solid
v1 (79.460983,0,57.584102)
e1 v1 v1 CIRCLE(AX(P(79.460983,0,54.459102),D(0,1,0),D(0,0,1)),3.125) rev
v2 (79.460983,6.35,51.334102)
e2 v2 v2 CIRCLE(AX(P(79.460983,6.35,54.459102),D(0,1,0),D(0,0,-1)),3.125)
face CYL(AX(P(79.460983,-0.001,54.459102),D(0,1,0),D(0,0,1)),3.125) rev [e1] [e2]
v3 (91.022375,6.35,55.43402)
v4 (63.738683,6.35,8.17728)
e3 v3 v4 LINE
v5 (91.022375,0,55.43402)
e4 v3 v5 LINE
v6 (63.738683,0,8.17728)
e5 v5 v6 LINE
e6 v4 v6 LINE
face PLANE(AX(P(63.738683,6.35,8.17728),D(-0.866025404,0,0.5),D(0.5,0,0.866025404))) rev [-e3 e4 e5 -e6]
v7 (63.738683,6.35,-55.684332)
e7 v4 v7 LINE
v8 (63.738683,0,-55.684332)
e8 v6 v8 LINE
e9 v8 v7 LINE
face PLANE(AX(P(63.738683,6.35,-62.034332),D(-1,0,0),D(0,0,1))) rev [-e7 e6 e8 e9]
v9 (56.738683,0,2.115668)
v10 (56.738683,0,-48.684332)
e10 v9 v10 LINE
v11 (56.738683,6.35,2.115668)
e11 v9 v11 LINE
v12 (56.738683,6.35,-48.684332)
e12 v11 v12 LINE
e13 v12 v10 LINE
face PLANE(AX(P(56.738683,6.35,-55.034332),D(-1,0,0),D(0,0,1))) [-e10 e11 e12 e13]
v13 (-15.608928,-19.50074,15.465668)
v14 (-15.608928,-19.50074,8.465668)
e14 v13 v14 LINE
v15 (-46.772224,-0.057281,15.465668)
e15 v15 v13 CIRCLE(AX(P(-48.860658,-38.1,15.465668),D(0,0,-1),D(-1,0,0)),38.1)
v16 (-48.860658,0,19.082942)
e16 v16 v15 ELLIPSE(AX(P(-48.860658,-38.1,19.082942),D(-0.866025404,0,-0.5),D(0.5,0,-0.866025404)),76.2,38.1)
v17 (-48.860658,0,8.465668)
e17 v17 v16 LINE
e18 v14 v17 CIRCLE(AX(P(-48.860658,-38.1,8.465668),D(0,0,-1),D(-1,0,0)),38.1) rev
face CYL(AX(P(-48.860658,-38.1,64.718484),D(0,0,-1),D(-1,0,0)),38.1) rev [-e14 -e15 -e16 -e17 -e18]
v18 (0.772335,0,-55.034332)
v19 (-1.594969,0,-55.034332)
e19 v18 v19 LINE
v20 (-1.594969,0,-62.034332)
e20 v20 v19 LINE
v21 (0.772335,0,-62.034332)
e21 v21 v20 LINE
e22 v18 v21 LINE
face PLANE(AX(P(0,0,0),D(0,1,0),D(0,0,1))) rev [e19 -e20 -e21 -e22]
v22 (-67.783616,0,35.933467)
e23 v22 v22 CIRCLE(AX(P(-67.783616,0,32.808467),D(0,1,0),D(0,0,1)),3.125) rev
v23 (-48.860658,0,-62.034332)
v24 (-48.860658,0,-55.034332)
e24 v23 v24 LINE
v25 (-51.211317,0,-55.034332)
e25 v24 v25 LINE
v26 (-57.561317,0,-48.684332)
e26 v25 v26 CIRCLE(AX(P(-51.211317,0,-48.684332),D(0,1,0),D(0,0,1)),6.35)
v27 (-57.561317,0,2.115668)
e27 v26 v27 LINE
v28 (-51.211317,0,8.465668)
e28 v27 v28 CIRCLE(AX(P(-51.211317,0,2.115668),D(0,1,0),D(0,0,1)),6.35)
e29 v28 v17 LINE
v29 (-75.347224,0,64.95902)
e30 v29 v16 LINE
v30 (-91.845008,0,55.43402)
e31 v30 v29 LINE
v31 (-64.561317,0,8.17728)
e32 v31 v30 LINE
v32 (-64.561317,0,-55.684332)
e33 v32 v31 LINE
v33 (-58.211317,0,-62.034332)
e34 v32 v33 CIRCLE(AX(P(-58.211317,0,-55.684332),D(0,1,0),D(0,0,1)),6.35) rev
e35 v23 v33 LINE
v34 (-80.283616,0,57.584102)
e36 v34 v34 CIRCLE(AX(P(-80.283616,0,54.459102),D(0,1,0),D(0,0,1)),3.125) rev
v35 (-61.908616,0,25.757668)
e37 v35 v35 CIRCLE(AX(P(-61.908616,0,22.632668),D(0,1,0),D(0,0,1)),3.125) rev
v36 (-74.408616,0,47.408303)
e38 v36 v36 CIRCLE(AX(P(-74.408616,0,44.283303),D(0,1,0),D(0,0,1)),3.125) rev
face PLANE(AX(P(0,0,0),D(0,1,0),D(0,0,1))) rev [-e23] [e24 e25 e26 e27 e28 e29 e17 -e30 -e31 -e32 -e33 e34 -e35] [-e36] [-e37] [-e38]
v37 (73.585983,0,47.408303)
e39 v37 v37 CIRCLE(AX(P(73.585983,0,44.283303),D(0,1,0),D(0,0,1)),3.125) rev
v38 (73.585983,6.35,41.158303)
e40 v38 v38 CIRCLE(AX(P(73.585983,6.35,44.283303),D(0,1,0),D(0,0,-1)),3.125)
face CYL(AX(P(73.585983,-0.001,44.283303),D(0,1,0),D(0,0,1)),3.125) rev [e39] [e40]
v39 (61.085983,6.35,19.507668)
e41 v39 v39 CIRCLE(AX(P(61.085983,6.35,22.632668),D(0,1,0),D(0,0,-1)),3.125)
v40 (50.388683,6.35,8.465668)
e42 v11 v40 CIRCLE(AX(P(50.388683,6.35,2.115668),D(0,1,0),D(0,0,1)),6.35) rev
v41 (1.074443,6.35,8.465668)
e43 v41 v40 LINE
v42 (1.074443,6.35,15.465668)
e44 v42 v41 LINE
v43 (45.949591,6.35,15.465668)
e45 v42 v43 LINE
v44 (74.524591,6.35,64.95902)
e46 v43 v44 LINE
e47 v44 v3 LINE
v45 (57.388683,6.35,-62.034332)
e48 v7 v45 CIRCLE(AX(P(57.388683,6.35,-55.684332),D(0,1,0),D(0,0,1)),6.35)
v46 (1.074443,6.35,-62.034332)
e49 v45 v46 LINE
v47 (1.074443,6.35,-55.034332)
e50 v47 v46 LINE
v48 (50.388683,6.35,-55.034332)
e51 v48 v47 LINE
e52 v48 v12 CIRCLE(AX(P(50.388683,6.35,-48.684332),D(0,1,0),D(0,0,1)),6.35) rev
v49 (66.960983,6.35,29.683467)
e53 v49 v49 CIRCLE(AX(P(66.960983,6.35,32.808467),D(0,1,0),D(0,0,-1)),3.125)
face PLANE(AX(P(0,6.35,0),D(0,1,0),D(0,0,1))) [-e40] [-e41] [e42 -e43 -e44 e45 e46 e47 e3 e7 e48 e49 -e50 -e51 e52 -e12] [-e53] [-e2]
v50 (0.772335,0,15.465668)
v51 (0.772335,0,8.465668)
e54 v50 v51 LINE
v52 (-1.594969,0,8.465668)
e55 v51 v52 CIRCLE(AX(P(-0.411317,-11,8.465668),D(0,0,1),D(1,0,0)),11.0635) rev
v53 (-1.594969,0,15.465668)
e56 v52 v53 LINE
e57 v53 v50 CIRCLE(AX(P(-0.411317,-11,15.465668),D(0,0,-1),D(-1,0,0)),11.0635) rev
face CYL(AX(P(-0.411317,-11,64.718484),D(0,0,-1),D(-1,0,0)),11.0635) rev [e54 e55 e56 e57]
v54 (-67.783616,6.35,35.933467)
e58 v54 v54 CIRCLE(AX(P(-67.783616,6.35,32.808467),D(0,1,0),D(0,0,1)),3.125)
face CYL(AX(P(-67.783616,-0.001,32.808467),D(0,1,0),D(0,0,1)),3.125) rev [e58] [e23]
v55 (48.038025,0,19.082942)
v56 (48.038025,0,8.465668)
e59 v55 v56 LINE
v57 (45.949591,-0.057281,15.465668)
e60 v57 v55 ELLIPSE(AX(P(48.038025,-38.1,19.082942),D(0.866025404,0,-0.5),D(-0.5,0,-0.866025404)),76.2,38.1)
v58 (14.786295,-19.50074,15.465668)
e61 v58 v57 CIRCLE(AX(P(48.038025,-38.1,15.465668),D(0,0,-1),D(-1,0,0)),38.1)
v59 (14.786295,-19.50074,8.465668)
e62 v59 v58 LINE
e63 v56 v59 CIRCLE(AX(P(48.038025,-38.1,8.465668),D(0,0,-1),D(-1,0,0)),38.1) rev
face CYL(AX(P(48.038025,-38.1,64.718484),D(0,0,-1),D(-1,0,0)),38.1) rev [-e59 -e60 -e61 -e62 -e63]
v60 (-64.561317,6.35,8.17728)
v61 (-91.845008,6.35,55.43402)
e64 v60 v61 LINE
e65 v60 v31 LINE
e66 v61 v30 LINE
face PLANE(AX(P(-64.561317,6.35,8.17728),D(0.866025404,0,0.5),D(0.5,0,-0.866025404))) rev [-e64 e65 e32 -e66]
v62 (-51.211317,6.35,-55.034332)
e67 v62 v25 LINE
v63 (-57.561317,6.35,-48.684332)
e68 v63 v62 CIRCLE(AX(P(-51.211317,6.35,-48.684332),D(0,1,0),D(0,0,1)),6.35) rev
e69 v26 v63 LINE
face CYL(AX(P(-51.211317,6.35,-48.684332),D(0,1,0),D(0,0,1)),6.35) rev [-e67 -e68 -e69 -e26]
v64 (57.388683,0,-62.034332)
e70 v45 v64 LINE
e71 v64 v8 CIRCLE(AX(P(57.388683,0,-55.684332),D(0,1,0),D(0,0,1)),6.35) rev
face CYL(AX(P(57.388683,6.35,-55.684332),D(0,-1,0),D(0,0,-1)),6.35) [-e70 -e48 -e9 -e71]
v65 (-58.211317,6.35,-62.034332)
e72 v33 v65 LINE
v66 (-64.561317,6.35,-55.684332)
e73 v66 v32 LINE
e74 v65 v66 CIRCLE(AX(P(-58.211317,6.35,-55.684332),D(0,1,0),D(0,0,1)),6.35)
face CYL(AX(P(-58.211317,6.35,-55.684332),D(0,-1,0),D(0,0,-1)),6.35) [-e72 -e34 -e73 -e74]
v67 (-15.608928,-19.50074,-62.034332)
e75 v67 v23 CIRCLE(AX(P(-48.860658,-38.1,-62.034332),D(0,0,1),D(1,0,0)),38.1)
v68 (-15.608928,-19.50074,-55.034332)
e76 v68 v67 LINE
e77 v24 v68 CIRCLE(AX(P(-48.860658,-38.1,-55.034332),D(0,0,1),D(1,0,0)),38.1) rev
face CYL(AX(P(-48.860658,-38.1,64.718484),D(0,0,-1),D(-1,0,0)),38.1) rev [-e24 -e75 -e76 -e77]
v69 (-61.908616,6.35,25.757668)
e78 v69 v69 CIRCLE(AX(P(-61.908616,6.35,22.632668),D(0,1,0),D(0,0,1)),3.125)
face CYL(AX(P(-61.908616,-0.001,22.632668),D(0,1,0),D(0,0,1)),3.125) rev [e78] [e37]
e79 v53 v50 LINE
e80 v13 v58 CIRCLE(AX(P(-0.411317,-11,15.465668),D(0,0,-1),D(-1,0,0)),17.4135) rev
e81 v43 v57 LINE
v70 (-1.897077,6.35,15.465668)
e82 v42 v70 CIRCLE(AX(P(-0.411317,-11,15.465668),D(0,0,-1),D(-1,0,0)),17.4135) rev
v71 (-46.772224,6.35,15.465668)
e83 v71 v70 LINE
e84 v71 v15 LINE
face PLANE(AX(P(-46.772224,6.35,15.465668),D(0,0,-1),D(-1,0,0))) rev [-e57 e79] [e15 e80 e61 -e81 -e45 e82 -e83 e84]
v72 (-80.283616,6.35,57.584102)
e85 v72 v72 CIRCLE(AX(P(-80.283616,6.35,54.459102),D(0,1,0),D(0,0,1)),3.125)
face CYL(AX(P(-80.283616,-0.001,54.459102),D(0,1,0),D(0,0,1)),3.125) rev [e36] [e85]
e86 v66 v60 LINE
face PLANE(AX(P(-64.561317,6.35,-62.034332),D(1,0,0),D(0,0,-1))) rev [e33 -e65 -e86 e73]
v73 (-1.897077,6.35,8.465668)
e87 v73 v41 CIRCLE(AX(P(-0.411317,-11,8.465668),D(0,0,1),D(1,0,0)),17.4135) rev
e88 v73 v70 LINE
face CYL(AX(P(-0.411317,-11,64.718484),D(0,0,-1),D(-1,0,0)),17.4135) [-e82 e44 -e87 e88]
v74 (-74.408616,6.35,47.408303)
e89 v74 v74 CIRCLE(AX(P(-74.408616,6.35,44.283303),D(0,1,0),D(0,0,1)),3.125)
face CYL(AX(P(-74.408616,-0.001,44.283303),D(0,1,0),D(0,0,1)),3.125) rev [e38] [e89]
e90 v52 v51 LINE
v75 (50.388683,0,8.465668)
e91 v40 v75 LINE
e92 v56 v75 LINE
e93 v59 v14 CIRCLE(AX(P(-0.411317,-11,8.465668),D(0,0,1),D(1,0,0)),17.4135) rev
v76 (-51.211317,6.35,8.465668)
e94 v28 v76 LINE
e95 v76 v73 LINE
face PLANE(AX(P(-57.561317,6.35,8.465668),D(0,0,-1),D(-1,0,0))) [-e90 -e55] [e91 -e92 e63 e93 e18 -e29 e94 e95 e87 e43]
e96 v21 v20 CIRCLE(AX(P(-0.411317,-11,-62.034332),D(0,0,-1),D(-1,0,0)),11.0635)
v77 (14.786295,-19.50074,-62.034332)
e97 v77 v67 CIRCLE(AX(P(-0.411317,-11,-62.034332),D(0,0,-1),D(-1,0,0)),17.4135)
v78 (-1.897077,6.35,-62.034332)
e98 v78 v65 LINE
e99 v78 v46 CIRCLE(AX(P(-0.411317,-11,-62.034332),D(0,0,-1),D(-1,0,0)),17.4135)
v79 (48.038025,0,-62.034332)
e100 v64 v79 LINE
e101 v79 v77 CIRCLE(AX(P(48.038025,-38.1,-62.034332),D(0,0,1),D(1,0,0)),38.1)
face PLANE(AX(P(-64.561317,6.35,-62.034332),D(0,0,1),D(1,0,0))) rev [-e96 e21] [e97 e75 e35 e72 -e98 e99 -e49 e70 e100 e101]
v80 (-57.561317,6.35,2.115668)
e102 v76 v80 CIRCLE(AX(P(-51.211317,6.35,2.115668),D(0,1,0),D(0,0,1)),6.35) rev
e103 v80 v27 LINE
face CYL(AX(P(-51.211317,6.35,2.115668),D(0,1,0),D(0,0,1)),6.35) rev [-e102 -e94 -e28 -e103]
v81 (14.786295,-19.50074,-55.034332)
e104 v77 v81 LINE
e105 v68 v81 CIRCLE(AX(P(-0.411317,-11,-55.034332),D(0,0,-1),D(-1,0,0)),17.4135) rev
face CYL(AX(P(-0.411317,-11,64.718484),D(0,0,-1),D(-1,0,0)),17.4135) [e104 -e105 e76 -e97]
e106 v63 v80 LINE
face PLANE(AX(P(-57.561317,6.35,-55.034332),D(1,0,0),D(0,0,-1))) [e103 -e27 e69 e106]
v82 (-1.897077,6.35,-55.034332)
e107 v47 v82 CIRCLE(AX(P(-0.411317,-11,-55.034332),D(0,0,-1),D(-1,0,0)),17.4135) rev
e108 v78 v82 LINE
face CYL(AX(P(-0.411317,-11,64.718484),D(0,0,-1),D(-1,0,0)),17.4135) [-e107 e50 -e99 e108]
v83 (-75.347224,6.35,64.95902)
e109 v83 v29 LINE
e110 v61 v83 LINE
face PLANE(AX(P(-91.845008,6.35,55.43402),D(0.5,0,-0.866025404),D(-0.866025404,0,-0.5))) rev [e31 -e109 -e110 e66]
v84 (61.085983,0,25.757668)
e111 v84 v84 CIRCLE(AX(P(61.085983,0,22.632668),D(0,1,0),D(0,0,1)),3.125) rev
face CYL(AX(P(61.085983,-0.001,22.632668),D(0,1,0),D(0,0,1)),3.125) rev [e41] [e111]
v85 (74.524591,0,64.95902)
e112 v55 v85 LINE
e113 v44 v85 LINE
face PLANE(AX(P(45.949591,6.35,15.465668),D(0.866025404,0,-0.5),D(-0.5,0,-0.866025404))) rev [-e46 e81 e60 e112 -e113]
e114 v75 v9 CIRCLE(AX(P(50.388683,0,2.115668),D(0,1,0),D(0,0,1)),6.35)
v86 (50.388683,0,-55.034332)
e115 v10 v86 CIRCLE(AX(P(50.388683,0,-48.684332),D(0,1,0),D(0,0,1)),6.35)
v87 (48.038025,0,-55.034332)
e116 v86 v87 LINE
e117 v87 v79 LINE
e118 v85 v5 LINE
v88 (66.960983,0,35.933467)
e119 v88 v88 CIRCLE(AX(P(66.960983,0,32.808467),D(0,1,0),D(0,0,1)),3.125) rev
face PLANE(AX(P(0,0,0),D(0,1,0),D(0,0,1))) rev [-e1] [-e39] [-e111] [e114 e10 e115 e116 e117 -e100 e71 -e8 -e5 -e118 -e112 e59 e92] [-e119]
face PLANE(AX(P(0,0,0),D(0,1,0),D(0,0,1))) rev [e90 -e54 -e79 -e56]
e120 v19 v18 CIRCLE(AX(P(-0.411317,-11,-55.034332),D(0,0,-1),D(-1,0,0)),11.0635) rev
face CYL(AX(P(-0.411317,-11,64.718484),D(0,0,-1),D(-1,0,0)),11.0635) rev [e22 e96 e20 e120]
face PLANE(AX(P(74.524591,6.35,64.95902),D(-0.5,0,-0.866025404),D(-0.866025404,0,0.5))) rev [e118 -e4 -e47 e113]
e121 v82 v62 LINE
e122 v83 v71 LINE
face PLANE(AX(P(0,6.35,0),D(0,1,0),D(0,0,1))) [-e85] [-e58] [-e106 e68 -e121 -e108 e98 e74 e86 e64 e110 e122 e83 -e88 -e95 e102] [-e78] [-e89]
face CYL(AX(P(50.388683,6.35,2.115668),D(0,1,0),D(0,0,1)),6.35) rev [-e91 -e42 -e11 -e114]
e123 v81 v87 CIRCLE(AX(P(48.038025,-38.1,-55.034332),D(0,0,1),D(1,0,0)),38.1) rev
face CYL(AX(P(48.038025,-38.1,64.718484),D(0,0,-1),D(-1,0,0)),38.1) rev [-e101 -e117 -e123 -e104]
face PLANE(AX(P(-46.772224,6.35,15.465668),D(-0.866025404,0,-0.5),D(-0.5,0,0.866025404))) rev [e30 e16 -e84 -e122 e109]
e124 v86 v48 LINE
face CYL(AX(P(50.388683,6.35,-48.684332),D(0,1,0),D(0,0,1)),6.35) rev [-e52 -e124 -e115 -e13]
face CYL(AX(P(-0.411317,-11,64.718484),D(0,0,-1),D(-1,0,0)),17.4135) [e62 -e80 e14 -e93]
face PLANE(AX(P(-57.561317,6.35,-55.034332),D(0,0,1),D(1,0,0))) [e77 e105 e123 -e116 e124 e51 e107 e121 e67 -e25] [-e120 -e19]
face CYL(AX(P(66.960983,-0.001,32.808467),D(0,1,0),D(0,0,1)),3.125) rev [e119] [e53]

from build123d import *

# Parameters (mm, degrees)
SKETCH2_W               = 114.3
SKETCH2_H               = 63.5
BOSS_EXTRUDE1_DEPTH     = 6.35
CUT_EXTRUDE1_REACH      = 114.674
SKETCH3_R               = 3.125
BOSS_EXTRUDE7_REACH     = 158.854
SKETCH5_R               = 17.4135
SKETCH5_R_2             = 11.0635
FILLET1_R               = 38.1
CUT_EXTRUDE2_DEPTH      = 118.744132595
CUT_EXTRUDE2_DEPTH_BACK = 118.744132595
SKETCH6_W               = 114.3
SKETCH6_H               = 63.5
FILLET2_R               = 6.35


with BuildPart() as part:
    # Sketch2 → Boss-Extrude1 (new body)
    with BuildSketch(Plane(origin=(0, 0, 0), x_dir=(1, 0, 0), z_dir=(0, 1, 0))):
        Polygon((-64.561316825, 62.034331754), (-64.561316825, -8.177280248), (-91.845008266, -55.434020042), (-75.347224324, -64.959020042), (-46.772224324, -15.465668216), (45.949590674, -15.465668216), (74.524590674, -64.959020042), (91.022374616, -55.434020042), (63.738683175, -8.177280248), (63.738683175, 62.034331754), align=None)
        with Locations((-0.411316825, 23.284331754)):
            Rectangle(SKETCH2_W, SKETCH2_H, mode=Mode.SUBTRACT)
    extrude(amount=BOSS_EXTRUDE1_DEPTH)

    # Sketch3 → Cut-Extrude1 (cut, up to next)
    with BuildSketch(Plane(origin=(0, 6.35, 0), x_dir=(1, 0, 0), z_dir=(0, 1, 0)), mode=Mode.PRIVATE) as cut_extrude1_sk1:
        with Locations(Location((-67.783616297, -32.808466651, 0), (0, 0, 270))):
            Circle(SKETCH3_R)
    cut_extrude1_tool1 = extrude(cut_extrude1_sk1.sketch, amount=-CUT_EXTRUDE1_REACH, mode=Mode.PRIVATE) & part.part
    # Sketch3 → Cut-Extrude1 (cut, up to next)
    with BuildSketch(Plane(origin=(0, 6.35, 0), x_dir=(1, 0, 0), z_dir=(0, 1, 0)), mode=Mode.PRIVATE) as cut_extrude1_sk2:
        with Locations(Location((-61.908616236, -22.632668051, 0), (0, 0, 270))):
            Circle(SKETCH3_R)
    cut_extrude1_tool2 = extrude(cut_extrude1_sk2.sketch, amount=-CUT_EXTRUDE1_REACH, mode=Mode.PRIVATE) & part.part
    # Sketch3 → Cut-Extrude1 (cut, up to next)
    with BuildSketch(Plane(origin=(0, 6.35, 0), x_dir=(1, 0, 0), z_dir=(0, 1, 0)), mode=Mode.PRIVATE) as cut_extrude1_sk3:
        with Locations(Location((-74.408616255, -44.283303179, 0), (0, 0, 270))):
            Circle(SKETCH3_R)
    cut_extrude1_tool3 = extrude(cut_extrude1_sk3.sketch, amount=-CUT_EXTRUDE1_REACH, mode=Mode.PRIVATE) & part.part
    # Sketch3 → Cut-Extrude1 (cut, up to next)
    with BuildSketch(Plane(origin=(0, 6.35, 0), x_dir=(1, 0, 0), z_dir=(0, 1, 0)), mode=Mode.PRIVATE) as cut_extrude1_sk4:
        with Locations(Location((-80.283616316, -54.459101779, 0), (0, 0, 270))):
            Circle(SKETCH3_R)
    cut_extrude1_tool4 = extrude(cut_extrude1_sk4.sketch, amount=-CUT_EXTRUDE1_REACH, mode=Mode.PRIVATE) & part.part
    # Sketch3 → Cut-Extrude1 (cut, up to next)
    with BuildSketch(Plane(origin=(0, 6.35, 0), x_dir=(1, 0, 0), z_dir=(0, 1, 0)), mode=Mode.PRIVATE) as cut_extrude1_sk5:
        with Locations(Location((79.460982666, -54.459101779, 0), (0, 0, 270))):
            Circle(SKETCH3_R)
    cut_extrude1_tool5 = extrude(cut_extrude1_sk5.sketch, amount=-CUT_EXTRUDE1_REACH, mode=Mode.PRIVATE) & part.part
    # Sketch3 → Cut-Extrude1 (cut, up to next)
    with BuildSketch(Plane(origin=(0, 6.35, 0), x_dir=(1, 0, 0), z_dir=(0, 1, 0)), mode=Mode.PRIVATE) as cut_extrude1_sk6:
        with Locations(Location((73.585982605, -44.283303179, 0), (0, 0, 270))):
            Circle(SKETCH3_R)
    cut_extrude1_tool6 = extrude(cut_extrude1_sk6.sketch, amount=-CUT_EXTRUDE1_REACH, mode=Mode.PRIVATE) & part.part
    # Sketch3 → Cut-Extrude1 (cut, up to next)
    with BuildSketch(Plane(origin=(0, 6.35, 0), x_dir=(1, 0, 0), z_dir=(0, 1, 0)), mode=Mode.PRIVATE) as cut_extrude1_sk7:
        with Locations(Location((61.085982586, -22.632668051, 0), (0, 0, 270))):
            Circle(SKETCH3_R)
    cut_extrude1_tool7 = extrude(cut_extrude1_sk7.sketch, amount=-CUT_EXTRUDE1_REACH, mode=Mode.PRIVATE) & part.part
    # Sketch3 → Cut-Extrude1 (cut, up to next)
    with BuildSketch(Plane(origin=(0, 6.35, 0), x_dir=(1, 0, 0), z_dir=(0, 1, 0)), mode=Mode.PRIVATE) as cut_extrude1_sk8:
        with Locations(Location((66.960982647, -32.808466651, 0), (0, 0, 270))):
            Circle(SKETCH3_R)
    cut_extrude1_tool8 = extrude(cut_extrude1_sk8.sketch, amount=-CUT_EXTRUDE1_REACH, mode=Mode.PRIVATE) & part.part
    add(cut_extrude1_tool1.solids().sort_by_distance((-67.783616, 6.35, 32.808467))[0], mode=Mode.SUBTRACT)
    add(cut_extrude1_tool2.solids().sort_by_distance((-61.908616, 6.35, 22.632668))[0], mode=Mode.SUBTRACT)
    add(cut_extrude1_tool3.solids().sort_by_distance((-74.408616, 6.35, 44.283303))[0], mode=Mode.SUBTRACT)
    add(cut_extrude1_tool4.solids().sort_by_distance((-80.283616, 6.35, 54.459102))[0], mode=Mode.SUBTRACT)
    add(cut_extrude1_tool5.solids().sort_by_distance((79.460983, 6.35, 54.459102))[0], mode=Mode.SUBTRACT)
    add(cut_extrude1_tool6.solids().sort_by_distance((73.585983, 6.35, 44.283303))[0], mode=Mode.SUBTRACT)
    add(cut_extrude1_tool7.solids().sort_by_distance((61.085983, 6.35, 22.632668))[0], mode=Mode.SUBTRACT)
    add(cut_extrude1_tool8.solids().sort_by_distance((66.960983, 6.35, 32.808467))[0], mode=Mode.SUBTRACT)

    # Boss-Extrude7: up to this face of the body (flat: up to its plane)
    boss_extrude7_end = Plane(part.part.faces().sort_by_distance((-0.411316825, 3.175, 15.465668216))[0])
    # Sketch5 → Boss-Extrude7 (add, up to the picked face)
    with BuildSketch(Plane(origin=(0, 0, -62.034331754), x_dir=(-1, 0, 0), z_dir=(0, 0, -1)), mode=Mode.PRIVATE) as boss_extrude7_sk1:
        with Locations(Location((0.411316825, -11, 0), (0, 0, 39.175198934))):
            Circle(SKETCH5_R)
        with Locations(Location((0.411316825, -11, 0), (0, 0, 83.858334426))):
            Circle(SKETCH5_R_2, mode=Mode.SUBTRACT)
    boss_extrude7_tool1 = split(extrude(boss_extrude7_sk1.sketch, amount=-BOSS_EXTRUDE7_REACH, mode=Mode.PRIVATE), bisect_by=boss_extrude7_end, keep=Keep.BOTH, mode=Mode.PRIVATE)
    add(boss_extrude7_tool1.solids().sort_by(Axis((12.706125, -21.688873, -62.034332), (0, 0, 1)))[0])

    # Fillet1
    # the kernel refuses this fillet: 38.1 mm, written as the material it adds along each edge
    with BuildSketch(Plane(origin=(-13.910575406, 0, -62.034331754), x_dir=(-0.0867632885558369, -0.9962289554911443, 0), z_dir=(0, 0, 1))) as fillet1_piece_1:
        with BuildLine():
            CenterArc((40.988707325, -31.512603208), FILLET1_R, 124.197770407, 60.77965812)
            Line((3.032384121, -34.818284502), (0, 0))
            ThreePointArc((0, 0), (9.787278443, -3.010751549), (19.574556886, 0))
        make_face()
    extrude(amount=7)
    with BuildSketch(Plane(origin=(-13.910575406, 0, -62.034331754), x_dir=(-0.0867632885558369, -0.9962289554911443, 0), z_dir=(0, 0, 1))) as fillet1_piece_2_section:
        with BuildLine():
            CenterArc((40.988707325, -31.512603208), FILLET1_R, 124.197770407, 60.77965812)
            Line((3.032384121, -34.818284502), (0, 0))
            ThreePointArc((0, 0), (9.787278443, -3.010751549), (19.574556886, 0))
        make_face()
    fillet1_piece_2 = extrude(amount=94.37520705, mode=Mode.PRIVATE)
    fillet1_piece_2 = split(fillet1_piece_2, bisect_by=Plane(origin=(-46.479711347, 0.329171961, 15.465668216), z_dir=(0, 0, -1)), keep=Keep.TOP, mode=Mode.PRIVATE)
    fillet1_piece_2 = split(fillet1_piece_2, bisect_by=Plane(origin=(-46.479711347, 0.329171961, 8.465668246), z_dir=(0, 0, 1)), keep=Keep.TOP, mode=Mode.PRIVATE)
    fillet1_piece_2 = split(fillet1_piece_2, bisect_by=Plane(origin=(-44.894051642, 0.329171961, 12.212577706), z_dir=(-0.8660254037844385, 0, -0.5000000000000003)), keep=Keep.TOP, mode=Mode.PRIVATE)
    add(fillet1_piece_2)
    with BuildSketch(Plane(origin=(-13.910575406, 0, -62.034331754), x_dir=(-0.0867632885558369, -0.9962289554911443, 0), z_dir=(0, 0, 1))) as fillet1_piece_3_section:
        with BuildLine():
            CenterArc((40.988707325, -31.512603208), FILLET1_R, 124.197770407, 60.77965812)
            Line((3.032384121, -34.818284502), (0, 0))
            ThreePointArc((0, 0), (9.787278443, -3.010751549), (19.574556886, 0))
        make_face()
    fillet1_piece_3 = extrude(amount=94.37520705, mode=Mode.PRIVATE)
    fillet1_piece_3 = split(fillet1_piece_3, bisect_by=Plane(origin=(-48.157624669, 0.376146064, 15.465668216), z_dir=(0, 0, 1)), keep=Keep.TOP, mode=Mode.PRIVATE)
    fillet1_piece_3 = split(fillet1_piece_3, bisect_by=Plane(origin=(-47.638099539, 0.376146064, 16.965408082), z_dir=(-0.8660254037844385, 0, -0.5000000000000003)), keep=Keep.TOP, mode=Mode.PRIVATE)
    add(fillet1_piece_3)
    with BuildSketch(Plane(origin=(-13.910575406, 0, -62.034331754), x_dir=(-0.0867632885558369, -0.9962289554911443, 0), z_dir=(0, 0, 1))) as fillet1_piece_4_section:
        with BuildLine():
            CenterArc((40.988707325, -31.512603208), FILLET1_R, 124.197770407, 60.77965812)
            Line((3.032384121, -34.818284502), (0, 0))
            ThreePointArc((0, 0), (9.787278443, -3.010751549), (19.574556886, 0))
        make_face()
    fillet1_piece_4 = extrude(amount=94.37520705, mode=Mode.PRIVATE)
    fillet1_piece_4 = split(fillet1_piece_4, bisect_by=Plane(origin=(-24.321436326, -4.363073993, 15.465668216), z_dir=(0, 0, -1)), keep=Keep.TOP, mode=Mode.PRIVATE)
    fillet1_piece_4 = split(fillet1_piece_4, bisect_by=Plane(origin=(-24.321436326, -4.363073993, 8.465668246), z_dir=(0, 0, 1)), keep=Keep.TOP, mode=Mode.PRIVATE)
    fillet1_piece_4 = split(fillet1_piece_4, bisect_by=Plane(origin=(-39.648984709, -4.363073993, 3.127855288), z_dir=(0.8660254037844385, 0, 0.5000000000000003)), keep=Keep.TOP, mode=Mode.PRIVATE)
    add(fillet1_piece_4)
    with BuildSketch(Plane(origin=(13.087941757, 0, 32.340875296), x_dir=(0.08676328855268206, -0.9962289554914191, 0), z_dir=(0, 0, -1))) as fillet1_piece_5_section:
        with BuildLine():
            CenterArc((40.988707325, -31.512603208), FILLET1_R, 124.197770407, 60.77965812)
            Line((3.032384121, -34.818284502), (0, 0))
            ThreePointArc((0, 0), (9.787278443, -3.010751549), (19.574556886, 0))
        make_face()
    fillet1_piece_5 = extrude(amount=94.37520705, mode=Mode.PRIVATE)
    fillet1_piece_5 = split(fillet1_piece_5, bisect_by=Plane(origin=(47.334991019, 0.376146064, 15.465668216), z_dir=(0, 0, 1)), keep=Keep.TOP, mode=Mode.PRIVATE)
    fillet1_piece_5 = split(fillet1_piece_5, bisect_by=Plane(origin=(46.81546589, 0.376146064, 16.965408082), z_dir=(0.8660254037844373, 0, -0.5000000000000024)), keep=Keep.TOP, mode=Mode.PRIVATE)
    add(fillet1_piece_5)
    with BuildSketch(Plane(origin=(13.087941757, 0, 32.340875296), x_dir=(0.08676328855268206, -0.9962289554914191, 0), z_dir=(0, 0, -1))) as fillet1_piece_6_section:
        with BuildLine():
            CenterArc((40.988707325, -31.512603208), FILLET1_R, 124.197770407, 60.77965812)
            Line((3.032384121, -34.818284502), (0, 0))
            ThreePointArc((0, 0), (9.787278443, -3.010751549), (19.574556886, 0))
        make_face()
    fillet1_piece_6 = extrude(amount=94.37520705, mode=Mode.PRIVATE)
    fillet1_piece_6 = split(fillet1_piece_6, bisect_by=Plane(origin=(23.498802677, -4.363073993, 15.465668216), z_dir=(0, 0, -1)), keep=Keep.TOP, mode=Mode.PRIVATE)
    fillet1_piece_6 = split(fillet1_piece_6, bisect_by=Plane(origin=(38.826351059, -4.363073993, 3.127855288), z_dir=(-0.8660254037844373, 0, 0.5000000000000024)), keep=Keep.TOP, mode=Mode.PRIVATE)
    fillet1_piece_6 = split(fillet1_piece_6, bisect_by=Plane(origin=(23.498802677, -4.363073993, 8.465668246), z_dir=(0, 0, 1)), keep=Keep.TOP, mode=Mode.PRIVATE)
    add(fillet1_piece_6)
    with BuildSketch(Plane(origin=(13.087941757, 0, 32.340875296), x_dir=(0.08676328855268206, -0.9962289554914191, 0), z_dir=(0, 0, -1))) as fillet1_piece_7_section:
        with BuildLine():
            CenterArc((40.988707325, -31.512603208), FILLET1_R, 124.197770407, 60.77965812)
            Line((3.032384121, -34.818284502), (0, 0))
            ThreePointArc((0, 0), (9.787278443, -3.010751549), (19.574556886, 0))
        make_face()
    fillet1_piece_7 = extrude(amount=94.37520705, mode=Mode.PRIVATE)
    fillet1_piece_7 = split(fillet1_piece_7, bisect_by=Plane(origin=(45.657077697, 0.329171961, 15.465668216), z_dir=(0, 0, -1)), keep=Keep.TOP, mode=Mode.PRIVATE)
    fillet1_piece_7 = split(fillet1_piece_7, bisect_by=Plane(origin=(44.071417993, 0.329171961, 12.212577706), z_dir=(0.8660254037844373, 0, -0.5000000000000024)), keep=Keep.TOP, mode=Mode.PRIVATE)
    fillet1_piece_7 = split(fillet1_piece_7, bisect_by=Plane(origin=(45.657077697, 0.329171961, 8.465668246), z_dir=(0, 0, 1)), keep=Keep.TOP, mode=Mode.PRIVATE)
    add(fillet1_piece_7)
    with BuildSketch(Plane(origin=(13.087941757, 0, -55.034331754), x_dir=(0.08676328855268206, -0.9962289554914191, 0), z_dir=(0, 0, -1))) as fillet1_piece_8:
        with BuildLine():
            CenterArc((40.988707325, -31.512603208), FILLET1_R, 124.197770407, 60.77965812)
            Line((3.032384121, -34.818284502), (0, 0))
            ThreePointArc((0, 0), (9.787278443, -3.010751549), (19.574556886, 0))
        make_face()
    extrude(amount=7)
    with BuildSketch(Plane(origin=(13.087941757, 0, 102.840875266), x_dir=(0.08676328855268206, -0.9962289554914191, 0), z_dir=(0, 0, -1))) as fillet1_piece_9_section:
        with BuildLine():
            CenterArc((40.988707325, -31.512603208), FILLET1_R, 124.197770407, 60.77965812)
            Line((3.032384121, -34.818284502), (0, 0))
            ThreePointArc((0, 0), (9.787278443, -3.010751549), (19.574556886, 0))
        make_face()
    fillet1_piece_9 = extrude(amount=94.37520702, mode=Mode.PRIVATE)
    fillet1_piece_9 = split(fillet1_piece_9, bisect_by=Plane(origin=(47.334991019, 0.376146064, 15.465668216), z_dir=(0, 0, 1)), keep=Keep.TOP, mode=Mode.PRIVATE)
    fillet1_piece_9 = split(fillet1_piece_9, bisect_by=Plane(origin=(46.81546589, 0.376146064, 16.965408082), z_dir=(0.8660254037844373, 0, -0.5000000000000024)), keep=Keep.TOP, mode=Mode.PRIVATE)
    add(fillet1_piece_9)
    with BuildSketch(Plane(origin=(13.087941757, 0, 15.465668216), x_dir=(0.08676328855268206, -0.9962289554914191, 0), z_dir=(0, 0, -1))) as fillet1_piece_10_section:
        with BuildLine():
            CenterArc((40.988707325, -31.512603208), FILLET1_R, 124.197770407, 60.77965812)
            Line((3.032384121, -34.818284502), (0, 0))
            ThreePointArc((0, 0), (9.787278443, -3.010751549), (19.574556886, 0))
        make_face()
    fillet1_piece_10 = extrude(amount=6.99999997, mode=Mode.PRIVATE)
    fillet1_piece_10 = split(fillet1_piece_10, bisect_by=Plane(origin=(38.826351059, -4.363073993, 3.127855288), z_dir=(-0.8660254037844373, 0, 0.5000000000000024)), keep=Keep.TOP, mode=Mode.PRIVATE)
    add(fillet1_piece_10)
    with BuildSketch(Plane(origin=(13.087941757, 0, 15.465668216), x_dir=(0.08676328855268206, -0.9962289554914191, 0), z_dir=(0, 0, -1))) as fillet1_piece_11_section:
        with BuildLine():
            CenterArc((40.988707325, -31.512603208), FILLET1_R, 124.197770407, 60.77965812)
            Line((3.032384121, -34.818284502), (0, 0))
            ThreePointArc((0, 0), (9.787278443, -3.010751549), (19.574556886, 0))
        make_face()
    fillet1_piece_11 = extrude(amount=6.99999997, mode=Mode.PRIVATE)
    fillet1_piece_11 = split(fillet1_piece_11, bisect_by=Plane(origin=(44.071417993, 0.329171961, 12.212577706), z_dir=(0.8660254037844373, 0, -0.5000000000000024)), keep=Keep.TOP, mode=Mode.PRIVATE)
    add(fillet1_piece_11)
    with BuildSketch(Plane(origin=(13.087941757, 0, 15.465668216), x_dir=(0.08676328855268206, -0.9962289554914191, 0), z_dir=(0, 0, -1))) as fillet1_piece_12_section:
        with BuildLine():
            CenterArc((40.988707325, -31.512603208), FILLET1_R, 124.197770407, 60.77965812)
            Line((3.032384121, -34.818284502), (0, 0))
            ThreePointArc((0, 0), (9.787278443, -3.010751549), (19.574556886, 0))
        make_face()
    fillet1_piece_12 = extrude(amount=94.37520702, mode=Mode.PRIVATE)
    fillet1_piece_12 = split(fillet1_piece_12, bisect_by=Plane(origin=(23.87513999, -4.28338064, -62.034331754), z_dir=(0, 0, 1)), keep=Keep.TOP, mode=Mode.PRIVATE)
    fillet1_piece_12 = split(fillet1_piece_12, bisect_by=Plane(origin=(23.87513999, -4.28338064, -55.034331754), z_dir=(0, 0, -1)), keep=Keep.TOP, mode=Mode.PRIVATE)
    add(fillet1_piece_12)
    with BuildSketch(Plane(origin=(-13.910575406, 0, -78.909538804), x_dir=(-0.08676328855268226, -0.9962289554914191, 0), z_dir=(0, 0, 1))) as fillet1_piece_13_section:
        with BuildLine():
            CenterArc((40.988707325, -31.512603208), FILLET1_R, 124.197770407, 60.77965812)
            Line((3.032384121, -34.818284502), (0, 0))
            ThreePointArc((0, 0), (9.787278443, -3.010751549), (19.574556886, 0))
        make_face()
    fillet1_piece_13 = extrude(amount=94.37520702, mode=Mode.PRIVATE)
    fillet1_piece_13 = split(fillet1_piece_13, bisect_by=Plane(origin=(-24.69777364, -4.28338064, -62.034331754), z_dir=(0, 0, 1)), keep=Keep.TOP, mode=Mode.PRIVATE)
    fillet1_piece_13 = split(fillet1_piece_13, bisect_by=Plane(origin=(-24.69777364, -4.28338064, -55.034331754), z_dir=(0, 0, -1)), keep=Keep.TOP, mode=Mode.PRIVATE)
    add(fillet1_piece_13)
    with BuildSketch(Plane(origin=(-13.910575406, 0, 8.465668246), x_dir=(-0.0867632885558369, -0.9962289554911443, 0), z_dir=(0, 0, 1))) as fillet1_piece_14_section:
        with BuildLine():
            CenterArc((40.988707325, -31.512603208), FILLET1_R, 124.197770407, 60.77965812)
            Line((3.032384121, -34.818284502), (0, 0))
            ThreePointArc((0, 0), (9.787278443, -3.010751549), (19.574556886, 0))
        make_face()
    fillet1_piece_14 = extrude(amount=6.99999997, mode=Mode.PRIVATE)
    fillet1_piece_14 = split(fillet1_piece_14, bisect_by=Plane(origin=(-44.894051642, 0.329171961, 12.212577706), z_dir=(-0.8660254037844385, 0, -0.5000000000000003)), keep=Keep.TOP, mode=Mode.PRIVATE)
    add(fillet1_piece_14)
    with BuildSketch(Plane(origin=(-13.910575406, 0, 8.465668246), x_dir=(-0.0867632885558369, -0.9962289554911443, 0), z_dir=(0, 0, 1))) as fillet1_piece_15_section:
        with BuildLine():
            CenterArc((40.988707325, -31.512603208), FILLET1_R, 124.197770407, 60.77965812)
            Line((3.032384121, -34.818284502), (0, 0))
            ThreePointArc((0, 0), (9.787278443, -3.010751549), (19.574556886, 0))
        make_face()
    fillet1_piece_15 = extrude(amount=94.37520702, mode=Mode.PRIVATE)
    fillet1_piece_15 = split(fillet1_piece_15, bisect_by=Plane(origin=(-48.157624669, 0.376146064, 15.465668216), z_dir=(0, 0, 1)), keep=Keep.TOP, mode=Mode.PRIVATE)
    fillet1_piece_15 = split(fillet1_piece_15, bisect_by=Plane(origin=(-47.638099539, 0.376146064, 16.965408082), z_dir=(-0.8660254037844385, 0, -0.5000000000000003)), keep=Keep.TOP, mode=Mode.PRIVATE)
    add(fillet1_piece_15)
    with BuildSketch(Plane(origin=(-13.910575406, 0, 8.465668246), x_dir=(-0.0867632885558369, -0.9962289554911443, 0), z_dir=(0, 0, 1))) as fillet1_piece_16_section:
        with BuildLine():
            CenterArc((40.988707325, -31.512603208), FILLET1_R, 124.197770407, 60.77965812)
            Line((3.032384121, -34.818284502), (0, 0))
            ThreePointArc((0, 0), (9.787278443, -3.010751549), (19.574556886, 0))
        make_face()
    fillet1_piece_16 = extrude(amount=6.99999997, mode=Mode.PRIVATE)
    fillet1_piece_16 = split(fillet1_piece_16, bisect_by=Plane(origin=(-39.648984709, -4.363073993, 3.127855288), z_dir=(0.8660254037844385, 0, 0.5000000000000003)), keep=Keep.TOP, mode=Mode.PRIVATE)
    add(fillet1_piece_16)

    # Sketch6 → Cut-Extrude2 (cut, two sides: drawn at the far end of the back side and taken through both)
    with BuildSketch(Plane(origin=(0, 6.35, 0), x_dir=(1, 0, 0), z_dir=(0, 1, 0)).offset(-CUT_EXTRUDE2_DEPTH_BACK)):
        with Locations((-0.411316825, 23.284331754)):
            Rectangle(SKETCH6_W, SKETCH6_H)
    extrude(amount=CUT_EXTRUDE2_DEPTH + CUT_EXTRUDE2_DEPTH_BACK, mode=Mode.SUBTRACT)

    # Fillet2
    fillet2_edges = [part.edges().sort_by_distance(p)[0] for p in [
        (-64.561316825, 3.175, -62.034331754),
        (63.738683175, 3.175, -62.034331754),
        (56.738683175, 3.175, -55.034331754),
        (-57.561316825, 3.175, -55.034331754),
        (-57.561316825, 3.175, 8.465668246),
        (56.738683175, 3.175, 8.465668246),
    ]]
    fillet(fillet2_edges, radius=FILLET2_R)


solid = part.part
